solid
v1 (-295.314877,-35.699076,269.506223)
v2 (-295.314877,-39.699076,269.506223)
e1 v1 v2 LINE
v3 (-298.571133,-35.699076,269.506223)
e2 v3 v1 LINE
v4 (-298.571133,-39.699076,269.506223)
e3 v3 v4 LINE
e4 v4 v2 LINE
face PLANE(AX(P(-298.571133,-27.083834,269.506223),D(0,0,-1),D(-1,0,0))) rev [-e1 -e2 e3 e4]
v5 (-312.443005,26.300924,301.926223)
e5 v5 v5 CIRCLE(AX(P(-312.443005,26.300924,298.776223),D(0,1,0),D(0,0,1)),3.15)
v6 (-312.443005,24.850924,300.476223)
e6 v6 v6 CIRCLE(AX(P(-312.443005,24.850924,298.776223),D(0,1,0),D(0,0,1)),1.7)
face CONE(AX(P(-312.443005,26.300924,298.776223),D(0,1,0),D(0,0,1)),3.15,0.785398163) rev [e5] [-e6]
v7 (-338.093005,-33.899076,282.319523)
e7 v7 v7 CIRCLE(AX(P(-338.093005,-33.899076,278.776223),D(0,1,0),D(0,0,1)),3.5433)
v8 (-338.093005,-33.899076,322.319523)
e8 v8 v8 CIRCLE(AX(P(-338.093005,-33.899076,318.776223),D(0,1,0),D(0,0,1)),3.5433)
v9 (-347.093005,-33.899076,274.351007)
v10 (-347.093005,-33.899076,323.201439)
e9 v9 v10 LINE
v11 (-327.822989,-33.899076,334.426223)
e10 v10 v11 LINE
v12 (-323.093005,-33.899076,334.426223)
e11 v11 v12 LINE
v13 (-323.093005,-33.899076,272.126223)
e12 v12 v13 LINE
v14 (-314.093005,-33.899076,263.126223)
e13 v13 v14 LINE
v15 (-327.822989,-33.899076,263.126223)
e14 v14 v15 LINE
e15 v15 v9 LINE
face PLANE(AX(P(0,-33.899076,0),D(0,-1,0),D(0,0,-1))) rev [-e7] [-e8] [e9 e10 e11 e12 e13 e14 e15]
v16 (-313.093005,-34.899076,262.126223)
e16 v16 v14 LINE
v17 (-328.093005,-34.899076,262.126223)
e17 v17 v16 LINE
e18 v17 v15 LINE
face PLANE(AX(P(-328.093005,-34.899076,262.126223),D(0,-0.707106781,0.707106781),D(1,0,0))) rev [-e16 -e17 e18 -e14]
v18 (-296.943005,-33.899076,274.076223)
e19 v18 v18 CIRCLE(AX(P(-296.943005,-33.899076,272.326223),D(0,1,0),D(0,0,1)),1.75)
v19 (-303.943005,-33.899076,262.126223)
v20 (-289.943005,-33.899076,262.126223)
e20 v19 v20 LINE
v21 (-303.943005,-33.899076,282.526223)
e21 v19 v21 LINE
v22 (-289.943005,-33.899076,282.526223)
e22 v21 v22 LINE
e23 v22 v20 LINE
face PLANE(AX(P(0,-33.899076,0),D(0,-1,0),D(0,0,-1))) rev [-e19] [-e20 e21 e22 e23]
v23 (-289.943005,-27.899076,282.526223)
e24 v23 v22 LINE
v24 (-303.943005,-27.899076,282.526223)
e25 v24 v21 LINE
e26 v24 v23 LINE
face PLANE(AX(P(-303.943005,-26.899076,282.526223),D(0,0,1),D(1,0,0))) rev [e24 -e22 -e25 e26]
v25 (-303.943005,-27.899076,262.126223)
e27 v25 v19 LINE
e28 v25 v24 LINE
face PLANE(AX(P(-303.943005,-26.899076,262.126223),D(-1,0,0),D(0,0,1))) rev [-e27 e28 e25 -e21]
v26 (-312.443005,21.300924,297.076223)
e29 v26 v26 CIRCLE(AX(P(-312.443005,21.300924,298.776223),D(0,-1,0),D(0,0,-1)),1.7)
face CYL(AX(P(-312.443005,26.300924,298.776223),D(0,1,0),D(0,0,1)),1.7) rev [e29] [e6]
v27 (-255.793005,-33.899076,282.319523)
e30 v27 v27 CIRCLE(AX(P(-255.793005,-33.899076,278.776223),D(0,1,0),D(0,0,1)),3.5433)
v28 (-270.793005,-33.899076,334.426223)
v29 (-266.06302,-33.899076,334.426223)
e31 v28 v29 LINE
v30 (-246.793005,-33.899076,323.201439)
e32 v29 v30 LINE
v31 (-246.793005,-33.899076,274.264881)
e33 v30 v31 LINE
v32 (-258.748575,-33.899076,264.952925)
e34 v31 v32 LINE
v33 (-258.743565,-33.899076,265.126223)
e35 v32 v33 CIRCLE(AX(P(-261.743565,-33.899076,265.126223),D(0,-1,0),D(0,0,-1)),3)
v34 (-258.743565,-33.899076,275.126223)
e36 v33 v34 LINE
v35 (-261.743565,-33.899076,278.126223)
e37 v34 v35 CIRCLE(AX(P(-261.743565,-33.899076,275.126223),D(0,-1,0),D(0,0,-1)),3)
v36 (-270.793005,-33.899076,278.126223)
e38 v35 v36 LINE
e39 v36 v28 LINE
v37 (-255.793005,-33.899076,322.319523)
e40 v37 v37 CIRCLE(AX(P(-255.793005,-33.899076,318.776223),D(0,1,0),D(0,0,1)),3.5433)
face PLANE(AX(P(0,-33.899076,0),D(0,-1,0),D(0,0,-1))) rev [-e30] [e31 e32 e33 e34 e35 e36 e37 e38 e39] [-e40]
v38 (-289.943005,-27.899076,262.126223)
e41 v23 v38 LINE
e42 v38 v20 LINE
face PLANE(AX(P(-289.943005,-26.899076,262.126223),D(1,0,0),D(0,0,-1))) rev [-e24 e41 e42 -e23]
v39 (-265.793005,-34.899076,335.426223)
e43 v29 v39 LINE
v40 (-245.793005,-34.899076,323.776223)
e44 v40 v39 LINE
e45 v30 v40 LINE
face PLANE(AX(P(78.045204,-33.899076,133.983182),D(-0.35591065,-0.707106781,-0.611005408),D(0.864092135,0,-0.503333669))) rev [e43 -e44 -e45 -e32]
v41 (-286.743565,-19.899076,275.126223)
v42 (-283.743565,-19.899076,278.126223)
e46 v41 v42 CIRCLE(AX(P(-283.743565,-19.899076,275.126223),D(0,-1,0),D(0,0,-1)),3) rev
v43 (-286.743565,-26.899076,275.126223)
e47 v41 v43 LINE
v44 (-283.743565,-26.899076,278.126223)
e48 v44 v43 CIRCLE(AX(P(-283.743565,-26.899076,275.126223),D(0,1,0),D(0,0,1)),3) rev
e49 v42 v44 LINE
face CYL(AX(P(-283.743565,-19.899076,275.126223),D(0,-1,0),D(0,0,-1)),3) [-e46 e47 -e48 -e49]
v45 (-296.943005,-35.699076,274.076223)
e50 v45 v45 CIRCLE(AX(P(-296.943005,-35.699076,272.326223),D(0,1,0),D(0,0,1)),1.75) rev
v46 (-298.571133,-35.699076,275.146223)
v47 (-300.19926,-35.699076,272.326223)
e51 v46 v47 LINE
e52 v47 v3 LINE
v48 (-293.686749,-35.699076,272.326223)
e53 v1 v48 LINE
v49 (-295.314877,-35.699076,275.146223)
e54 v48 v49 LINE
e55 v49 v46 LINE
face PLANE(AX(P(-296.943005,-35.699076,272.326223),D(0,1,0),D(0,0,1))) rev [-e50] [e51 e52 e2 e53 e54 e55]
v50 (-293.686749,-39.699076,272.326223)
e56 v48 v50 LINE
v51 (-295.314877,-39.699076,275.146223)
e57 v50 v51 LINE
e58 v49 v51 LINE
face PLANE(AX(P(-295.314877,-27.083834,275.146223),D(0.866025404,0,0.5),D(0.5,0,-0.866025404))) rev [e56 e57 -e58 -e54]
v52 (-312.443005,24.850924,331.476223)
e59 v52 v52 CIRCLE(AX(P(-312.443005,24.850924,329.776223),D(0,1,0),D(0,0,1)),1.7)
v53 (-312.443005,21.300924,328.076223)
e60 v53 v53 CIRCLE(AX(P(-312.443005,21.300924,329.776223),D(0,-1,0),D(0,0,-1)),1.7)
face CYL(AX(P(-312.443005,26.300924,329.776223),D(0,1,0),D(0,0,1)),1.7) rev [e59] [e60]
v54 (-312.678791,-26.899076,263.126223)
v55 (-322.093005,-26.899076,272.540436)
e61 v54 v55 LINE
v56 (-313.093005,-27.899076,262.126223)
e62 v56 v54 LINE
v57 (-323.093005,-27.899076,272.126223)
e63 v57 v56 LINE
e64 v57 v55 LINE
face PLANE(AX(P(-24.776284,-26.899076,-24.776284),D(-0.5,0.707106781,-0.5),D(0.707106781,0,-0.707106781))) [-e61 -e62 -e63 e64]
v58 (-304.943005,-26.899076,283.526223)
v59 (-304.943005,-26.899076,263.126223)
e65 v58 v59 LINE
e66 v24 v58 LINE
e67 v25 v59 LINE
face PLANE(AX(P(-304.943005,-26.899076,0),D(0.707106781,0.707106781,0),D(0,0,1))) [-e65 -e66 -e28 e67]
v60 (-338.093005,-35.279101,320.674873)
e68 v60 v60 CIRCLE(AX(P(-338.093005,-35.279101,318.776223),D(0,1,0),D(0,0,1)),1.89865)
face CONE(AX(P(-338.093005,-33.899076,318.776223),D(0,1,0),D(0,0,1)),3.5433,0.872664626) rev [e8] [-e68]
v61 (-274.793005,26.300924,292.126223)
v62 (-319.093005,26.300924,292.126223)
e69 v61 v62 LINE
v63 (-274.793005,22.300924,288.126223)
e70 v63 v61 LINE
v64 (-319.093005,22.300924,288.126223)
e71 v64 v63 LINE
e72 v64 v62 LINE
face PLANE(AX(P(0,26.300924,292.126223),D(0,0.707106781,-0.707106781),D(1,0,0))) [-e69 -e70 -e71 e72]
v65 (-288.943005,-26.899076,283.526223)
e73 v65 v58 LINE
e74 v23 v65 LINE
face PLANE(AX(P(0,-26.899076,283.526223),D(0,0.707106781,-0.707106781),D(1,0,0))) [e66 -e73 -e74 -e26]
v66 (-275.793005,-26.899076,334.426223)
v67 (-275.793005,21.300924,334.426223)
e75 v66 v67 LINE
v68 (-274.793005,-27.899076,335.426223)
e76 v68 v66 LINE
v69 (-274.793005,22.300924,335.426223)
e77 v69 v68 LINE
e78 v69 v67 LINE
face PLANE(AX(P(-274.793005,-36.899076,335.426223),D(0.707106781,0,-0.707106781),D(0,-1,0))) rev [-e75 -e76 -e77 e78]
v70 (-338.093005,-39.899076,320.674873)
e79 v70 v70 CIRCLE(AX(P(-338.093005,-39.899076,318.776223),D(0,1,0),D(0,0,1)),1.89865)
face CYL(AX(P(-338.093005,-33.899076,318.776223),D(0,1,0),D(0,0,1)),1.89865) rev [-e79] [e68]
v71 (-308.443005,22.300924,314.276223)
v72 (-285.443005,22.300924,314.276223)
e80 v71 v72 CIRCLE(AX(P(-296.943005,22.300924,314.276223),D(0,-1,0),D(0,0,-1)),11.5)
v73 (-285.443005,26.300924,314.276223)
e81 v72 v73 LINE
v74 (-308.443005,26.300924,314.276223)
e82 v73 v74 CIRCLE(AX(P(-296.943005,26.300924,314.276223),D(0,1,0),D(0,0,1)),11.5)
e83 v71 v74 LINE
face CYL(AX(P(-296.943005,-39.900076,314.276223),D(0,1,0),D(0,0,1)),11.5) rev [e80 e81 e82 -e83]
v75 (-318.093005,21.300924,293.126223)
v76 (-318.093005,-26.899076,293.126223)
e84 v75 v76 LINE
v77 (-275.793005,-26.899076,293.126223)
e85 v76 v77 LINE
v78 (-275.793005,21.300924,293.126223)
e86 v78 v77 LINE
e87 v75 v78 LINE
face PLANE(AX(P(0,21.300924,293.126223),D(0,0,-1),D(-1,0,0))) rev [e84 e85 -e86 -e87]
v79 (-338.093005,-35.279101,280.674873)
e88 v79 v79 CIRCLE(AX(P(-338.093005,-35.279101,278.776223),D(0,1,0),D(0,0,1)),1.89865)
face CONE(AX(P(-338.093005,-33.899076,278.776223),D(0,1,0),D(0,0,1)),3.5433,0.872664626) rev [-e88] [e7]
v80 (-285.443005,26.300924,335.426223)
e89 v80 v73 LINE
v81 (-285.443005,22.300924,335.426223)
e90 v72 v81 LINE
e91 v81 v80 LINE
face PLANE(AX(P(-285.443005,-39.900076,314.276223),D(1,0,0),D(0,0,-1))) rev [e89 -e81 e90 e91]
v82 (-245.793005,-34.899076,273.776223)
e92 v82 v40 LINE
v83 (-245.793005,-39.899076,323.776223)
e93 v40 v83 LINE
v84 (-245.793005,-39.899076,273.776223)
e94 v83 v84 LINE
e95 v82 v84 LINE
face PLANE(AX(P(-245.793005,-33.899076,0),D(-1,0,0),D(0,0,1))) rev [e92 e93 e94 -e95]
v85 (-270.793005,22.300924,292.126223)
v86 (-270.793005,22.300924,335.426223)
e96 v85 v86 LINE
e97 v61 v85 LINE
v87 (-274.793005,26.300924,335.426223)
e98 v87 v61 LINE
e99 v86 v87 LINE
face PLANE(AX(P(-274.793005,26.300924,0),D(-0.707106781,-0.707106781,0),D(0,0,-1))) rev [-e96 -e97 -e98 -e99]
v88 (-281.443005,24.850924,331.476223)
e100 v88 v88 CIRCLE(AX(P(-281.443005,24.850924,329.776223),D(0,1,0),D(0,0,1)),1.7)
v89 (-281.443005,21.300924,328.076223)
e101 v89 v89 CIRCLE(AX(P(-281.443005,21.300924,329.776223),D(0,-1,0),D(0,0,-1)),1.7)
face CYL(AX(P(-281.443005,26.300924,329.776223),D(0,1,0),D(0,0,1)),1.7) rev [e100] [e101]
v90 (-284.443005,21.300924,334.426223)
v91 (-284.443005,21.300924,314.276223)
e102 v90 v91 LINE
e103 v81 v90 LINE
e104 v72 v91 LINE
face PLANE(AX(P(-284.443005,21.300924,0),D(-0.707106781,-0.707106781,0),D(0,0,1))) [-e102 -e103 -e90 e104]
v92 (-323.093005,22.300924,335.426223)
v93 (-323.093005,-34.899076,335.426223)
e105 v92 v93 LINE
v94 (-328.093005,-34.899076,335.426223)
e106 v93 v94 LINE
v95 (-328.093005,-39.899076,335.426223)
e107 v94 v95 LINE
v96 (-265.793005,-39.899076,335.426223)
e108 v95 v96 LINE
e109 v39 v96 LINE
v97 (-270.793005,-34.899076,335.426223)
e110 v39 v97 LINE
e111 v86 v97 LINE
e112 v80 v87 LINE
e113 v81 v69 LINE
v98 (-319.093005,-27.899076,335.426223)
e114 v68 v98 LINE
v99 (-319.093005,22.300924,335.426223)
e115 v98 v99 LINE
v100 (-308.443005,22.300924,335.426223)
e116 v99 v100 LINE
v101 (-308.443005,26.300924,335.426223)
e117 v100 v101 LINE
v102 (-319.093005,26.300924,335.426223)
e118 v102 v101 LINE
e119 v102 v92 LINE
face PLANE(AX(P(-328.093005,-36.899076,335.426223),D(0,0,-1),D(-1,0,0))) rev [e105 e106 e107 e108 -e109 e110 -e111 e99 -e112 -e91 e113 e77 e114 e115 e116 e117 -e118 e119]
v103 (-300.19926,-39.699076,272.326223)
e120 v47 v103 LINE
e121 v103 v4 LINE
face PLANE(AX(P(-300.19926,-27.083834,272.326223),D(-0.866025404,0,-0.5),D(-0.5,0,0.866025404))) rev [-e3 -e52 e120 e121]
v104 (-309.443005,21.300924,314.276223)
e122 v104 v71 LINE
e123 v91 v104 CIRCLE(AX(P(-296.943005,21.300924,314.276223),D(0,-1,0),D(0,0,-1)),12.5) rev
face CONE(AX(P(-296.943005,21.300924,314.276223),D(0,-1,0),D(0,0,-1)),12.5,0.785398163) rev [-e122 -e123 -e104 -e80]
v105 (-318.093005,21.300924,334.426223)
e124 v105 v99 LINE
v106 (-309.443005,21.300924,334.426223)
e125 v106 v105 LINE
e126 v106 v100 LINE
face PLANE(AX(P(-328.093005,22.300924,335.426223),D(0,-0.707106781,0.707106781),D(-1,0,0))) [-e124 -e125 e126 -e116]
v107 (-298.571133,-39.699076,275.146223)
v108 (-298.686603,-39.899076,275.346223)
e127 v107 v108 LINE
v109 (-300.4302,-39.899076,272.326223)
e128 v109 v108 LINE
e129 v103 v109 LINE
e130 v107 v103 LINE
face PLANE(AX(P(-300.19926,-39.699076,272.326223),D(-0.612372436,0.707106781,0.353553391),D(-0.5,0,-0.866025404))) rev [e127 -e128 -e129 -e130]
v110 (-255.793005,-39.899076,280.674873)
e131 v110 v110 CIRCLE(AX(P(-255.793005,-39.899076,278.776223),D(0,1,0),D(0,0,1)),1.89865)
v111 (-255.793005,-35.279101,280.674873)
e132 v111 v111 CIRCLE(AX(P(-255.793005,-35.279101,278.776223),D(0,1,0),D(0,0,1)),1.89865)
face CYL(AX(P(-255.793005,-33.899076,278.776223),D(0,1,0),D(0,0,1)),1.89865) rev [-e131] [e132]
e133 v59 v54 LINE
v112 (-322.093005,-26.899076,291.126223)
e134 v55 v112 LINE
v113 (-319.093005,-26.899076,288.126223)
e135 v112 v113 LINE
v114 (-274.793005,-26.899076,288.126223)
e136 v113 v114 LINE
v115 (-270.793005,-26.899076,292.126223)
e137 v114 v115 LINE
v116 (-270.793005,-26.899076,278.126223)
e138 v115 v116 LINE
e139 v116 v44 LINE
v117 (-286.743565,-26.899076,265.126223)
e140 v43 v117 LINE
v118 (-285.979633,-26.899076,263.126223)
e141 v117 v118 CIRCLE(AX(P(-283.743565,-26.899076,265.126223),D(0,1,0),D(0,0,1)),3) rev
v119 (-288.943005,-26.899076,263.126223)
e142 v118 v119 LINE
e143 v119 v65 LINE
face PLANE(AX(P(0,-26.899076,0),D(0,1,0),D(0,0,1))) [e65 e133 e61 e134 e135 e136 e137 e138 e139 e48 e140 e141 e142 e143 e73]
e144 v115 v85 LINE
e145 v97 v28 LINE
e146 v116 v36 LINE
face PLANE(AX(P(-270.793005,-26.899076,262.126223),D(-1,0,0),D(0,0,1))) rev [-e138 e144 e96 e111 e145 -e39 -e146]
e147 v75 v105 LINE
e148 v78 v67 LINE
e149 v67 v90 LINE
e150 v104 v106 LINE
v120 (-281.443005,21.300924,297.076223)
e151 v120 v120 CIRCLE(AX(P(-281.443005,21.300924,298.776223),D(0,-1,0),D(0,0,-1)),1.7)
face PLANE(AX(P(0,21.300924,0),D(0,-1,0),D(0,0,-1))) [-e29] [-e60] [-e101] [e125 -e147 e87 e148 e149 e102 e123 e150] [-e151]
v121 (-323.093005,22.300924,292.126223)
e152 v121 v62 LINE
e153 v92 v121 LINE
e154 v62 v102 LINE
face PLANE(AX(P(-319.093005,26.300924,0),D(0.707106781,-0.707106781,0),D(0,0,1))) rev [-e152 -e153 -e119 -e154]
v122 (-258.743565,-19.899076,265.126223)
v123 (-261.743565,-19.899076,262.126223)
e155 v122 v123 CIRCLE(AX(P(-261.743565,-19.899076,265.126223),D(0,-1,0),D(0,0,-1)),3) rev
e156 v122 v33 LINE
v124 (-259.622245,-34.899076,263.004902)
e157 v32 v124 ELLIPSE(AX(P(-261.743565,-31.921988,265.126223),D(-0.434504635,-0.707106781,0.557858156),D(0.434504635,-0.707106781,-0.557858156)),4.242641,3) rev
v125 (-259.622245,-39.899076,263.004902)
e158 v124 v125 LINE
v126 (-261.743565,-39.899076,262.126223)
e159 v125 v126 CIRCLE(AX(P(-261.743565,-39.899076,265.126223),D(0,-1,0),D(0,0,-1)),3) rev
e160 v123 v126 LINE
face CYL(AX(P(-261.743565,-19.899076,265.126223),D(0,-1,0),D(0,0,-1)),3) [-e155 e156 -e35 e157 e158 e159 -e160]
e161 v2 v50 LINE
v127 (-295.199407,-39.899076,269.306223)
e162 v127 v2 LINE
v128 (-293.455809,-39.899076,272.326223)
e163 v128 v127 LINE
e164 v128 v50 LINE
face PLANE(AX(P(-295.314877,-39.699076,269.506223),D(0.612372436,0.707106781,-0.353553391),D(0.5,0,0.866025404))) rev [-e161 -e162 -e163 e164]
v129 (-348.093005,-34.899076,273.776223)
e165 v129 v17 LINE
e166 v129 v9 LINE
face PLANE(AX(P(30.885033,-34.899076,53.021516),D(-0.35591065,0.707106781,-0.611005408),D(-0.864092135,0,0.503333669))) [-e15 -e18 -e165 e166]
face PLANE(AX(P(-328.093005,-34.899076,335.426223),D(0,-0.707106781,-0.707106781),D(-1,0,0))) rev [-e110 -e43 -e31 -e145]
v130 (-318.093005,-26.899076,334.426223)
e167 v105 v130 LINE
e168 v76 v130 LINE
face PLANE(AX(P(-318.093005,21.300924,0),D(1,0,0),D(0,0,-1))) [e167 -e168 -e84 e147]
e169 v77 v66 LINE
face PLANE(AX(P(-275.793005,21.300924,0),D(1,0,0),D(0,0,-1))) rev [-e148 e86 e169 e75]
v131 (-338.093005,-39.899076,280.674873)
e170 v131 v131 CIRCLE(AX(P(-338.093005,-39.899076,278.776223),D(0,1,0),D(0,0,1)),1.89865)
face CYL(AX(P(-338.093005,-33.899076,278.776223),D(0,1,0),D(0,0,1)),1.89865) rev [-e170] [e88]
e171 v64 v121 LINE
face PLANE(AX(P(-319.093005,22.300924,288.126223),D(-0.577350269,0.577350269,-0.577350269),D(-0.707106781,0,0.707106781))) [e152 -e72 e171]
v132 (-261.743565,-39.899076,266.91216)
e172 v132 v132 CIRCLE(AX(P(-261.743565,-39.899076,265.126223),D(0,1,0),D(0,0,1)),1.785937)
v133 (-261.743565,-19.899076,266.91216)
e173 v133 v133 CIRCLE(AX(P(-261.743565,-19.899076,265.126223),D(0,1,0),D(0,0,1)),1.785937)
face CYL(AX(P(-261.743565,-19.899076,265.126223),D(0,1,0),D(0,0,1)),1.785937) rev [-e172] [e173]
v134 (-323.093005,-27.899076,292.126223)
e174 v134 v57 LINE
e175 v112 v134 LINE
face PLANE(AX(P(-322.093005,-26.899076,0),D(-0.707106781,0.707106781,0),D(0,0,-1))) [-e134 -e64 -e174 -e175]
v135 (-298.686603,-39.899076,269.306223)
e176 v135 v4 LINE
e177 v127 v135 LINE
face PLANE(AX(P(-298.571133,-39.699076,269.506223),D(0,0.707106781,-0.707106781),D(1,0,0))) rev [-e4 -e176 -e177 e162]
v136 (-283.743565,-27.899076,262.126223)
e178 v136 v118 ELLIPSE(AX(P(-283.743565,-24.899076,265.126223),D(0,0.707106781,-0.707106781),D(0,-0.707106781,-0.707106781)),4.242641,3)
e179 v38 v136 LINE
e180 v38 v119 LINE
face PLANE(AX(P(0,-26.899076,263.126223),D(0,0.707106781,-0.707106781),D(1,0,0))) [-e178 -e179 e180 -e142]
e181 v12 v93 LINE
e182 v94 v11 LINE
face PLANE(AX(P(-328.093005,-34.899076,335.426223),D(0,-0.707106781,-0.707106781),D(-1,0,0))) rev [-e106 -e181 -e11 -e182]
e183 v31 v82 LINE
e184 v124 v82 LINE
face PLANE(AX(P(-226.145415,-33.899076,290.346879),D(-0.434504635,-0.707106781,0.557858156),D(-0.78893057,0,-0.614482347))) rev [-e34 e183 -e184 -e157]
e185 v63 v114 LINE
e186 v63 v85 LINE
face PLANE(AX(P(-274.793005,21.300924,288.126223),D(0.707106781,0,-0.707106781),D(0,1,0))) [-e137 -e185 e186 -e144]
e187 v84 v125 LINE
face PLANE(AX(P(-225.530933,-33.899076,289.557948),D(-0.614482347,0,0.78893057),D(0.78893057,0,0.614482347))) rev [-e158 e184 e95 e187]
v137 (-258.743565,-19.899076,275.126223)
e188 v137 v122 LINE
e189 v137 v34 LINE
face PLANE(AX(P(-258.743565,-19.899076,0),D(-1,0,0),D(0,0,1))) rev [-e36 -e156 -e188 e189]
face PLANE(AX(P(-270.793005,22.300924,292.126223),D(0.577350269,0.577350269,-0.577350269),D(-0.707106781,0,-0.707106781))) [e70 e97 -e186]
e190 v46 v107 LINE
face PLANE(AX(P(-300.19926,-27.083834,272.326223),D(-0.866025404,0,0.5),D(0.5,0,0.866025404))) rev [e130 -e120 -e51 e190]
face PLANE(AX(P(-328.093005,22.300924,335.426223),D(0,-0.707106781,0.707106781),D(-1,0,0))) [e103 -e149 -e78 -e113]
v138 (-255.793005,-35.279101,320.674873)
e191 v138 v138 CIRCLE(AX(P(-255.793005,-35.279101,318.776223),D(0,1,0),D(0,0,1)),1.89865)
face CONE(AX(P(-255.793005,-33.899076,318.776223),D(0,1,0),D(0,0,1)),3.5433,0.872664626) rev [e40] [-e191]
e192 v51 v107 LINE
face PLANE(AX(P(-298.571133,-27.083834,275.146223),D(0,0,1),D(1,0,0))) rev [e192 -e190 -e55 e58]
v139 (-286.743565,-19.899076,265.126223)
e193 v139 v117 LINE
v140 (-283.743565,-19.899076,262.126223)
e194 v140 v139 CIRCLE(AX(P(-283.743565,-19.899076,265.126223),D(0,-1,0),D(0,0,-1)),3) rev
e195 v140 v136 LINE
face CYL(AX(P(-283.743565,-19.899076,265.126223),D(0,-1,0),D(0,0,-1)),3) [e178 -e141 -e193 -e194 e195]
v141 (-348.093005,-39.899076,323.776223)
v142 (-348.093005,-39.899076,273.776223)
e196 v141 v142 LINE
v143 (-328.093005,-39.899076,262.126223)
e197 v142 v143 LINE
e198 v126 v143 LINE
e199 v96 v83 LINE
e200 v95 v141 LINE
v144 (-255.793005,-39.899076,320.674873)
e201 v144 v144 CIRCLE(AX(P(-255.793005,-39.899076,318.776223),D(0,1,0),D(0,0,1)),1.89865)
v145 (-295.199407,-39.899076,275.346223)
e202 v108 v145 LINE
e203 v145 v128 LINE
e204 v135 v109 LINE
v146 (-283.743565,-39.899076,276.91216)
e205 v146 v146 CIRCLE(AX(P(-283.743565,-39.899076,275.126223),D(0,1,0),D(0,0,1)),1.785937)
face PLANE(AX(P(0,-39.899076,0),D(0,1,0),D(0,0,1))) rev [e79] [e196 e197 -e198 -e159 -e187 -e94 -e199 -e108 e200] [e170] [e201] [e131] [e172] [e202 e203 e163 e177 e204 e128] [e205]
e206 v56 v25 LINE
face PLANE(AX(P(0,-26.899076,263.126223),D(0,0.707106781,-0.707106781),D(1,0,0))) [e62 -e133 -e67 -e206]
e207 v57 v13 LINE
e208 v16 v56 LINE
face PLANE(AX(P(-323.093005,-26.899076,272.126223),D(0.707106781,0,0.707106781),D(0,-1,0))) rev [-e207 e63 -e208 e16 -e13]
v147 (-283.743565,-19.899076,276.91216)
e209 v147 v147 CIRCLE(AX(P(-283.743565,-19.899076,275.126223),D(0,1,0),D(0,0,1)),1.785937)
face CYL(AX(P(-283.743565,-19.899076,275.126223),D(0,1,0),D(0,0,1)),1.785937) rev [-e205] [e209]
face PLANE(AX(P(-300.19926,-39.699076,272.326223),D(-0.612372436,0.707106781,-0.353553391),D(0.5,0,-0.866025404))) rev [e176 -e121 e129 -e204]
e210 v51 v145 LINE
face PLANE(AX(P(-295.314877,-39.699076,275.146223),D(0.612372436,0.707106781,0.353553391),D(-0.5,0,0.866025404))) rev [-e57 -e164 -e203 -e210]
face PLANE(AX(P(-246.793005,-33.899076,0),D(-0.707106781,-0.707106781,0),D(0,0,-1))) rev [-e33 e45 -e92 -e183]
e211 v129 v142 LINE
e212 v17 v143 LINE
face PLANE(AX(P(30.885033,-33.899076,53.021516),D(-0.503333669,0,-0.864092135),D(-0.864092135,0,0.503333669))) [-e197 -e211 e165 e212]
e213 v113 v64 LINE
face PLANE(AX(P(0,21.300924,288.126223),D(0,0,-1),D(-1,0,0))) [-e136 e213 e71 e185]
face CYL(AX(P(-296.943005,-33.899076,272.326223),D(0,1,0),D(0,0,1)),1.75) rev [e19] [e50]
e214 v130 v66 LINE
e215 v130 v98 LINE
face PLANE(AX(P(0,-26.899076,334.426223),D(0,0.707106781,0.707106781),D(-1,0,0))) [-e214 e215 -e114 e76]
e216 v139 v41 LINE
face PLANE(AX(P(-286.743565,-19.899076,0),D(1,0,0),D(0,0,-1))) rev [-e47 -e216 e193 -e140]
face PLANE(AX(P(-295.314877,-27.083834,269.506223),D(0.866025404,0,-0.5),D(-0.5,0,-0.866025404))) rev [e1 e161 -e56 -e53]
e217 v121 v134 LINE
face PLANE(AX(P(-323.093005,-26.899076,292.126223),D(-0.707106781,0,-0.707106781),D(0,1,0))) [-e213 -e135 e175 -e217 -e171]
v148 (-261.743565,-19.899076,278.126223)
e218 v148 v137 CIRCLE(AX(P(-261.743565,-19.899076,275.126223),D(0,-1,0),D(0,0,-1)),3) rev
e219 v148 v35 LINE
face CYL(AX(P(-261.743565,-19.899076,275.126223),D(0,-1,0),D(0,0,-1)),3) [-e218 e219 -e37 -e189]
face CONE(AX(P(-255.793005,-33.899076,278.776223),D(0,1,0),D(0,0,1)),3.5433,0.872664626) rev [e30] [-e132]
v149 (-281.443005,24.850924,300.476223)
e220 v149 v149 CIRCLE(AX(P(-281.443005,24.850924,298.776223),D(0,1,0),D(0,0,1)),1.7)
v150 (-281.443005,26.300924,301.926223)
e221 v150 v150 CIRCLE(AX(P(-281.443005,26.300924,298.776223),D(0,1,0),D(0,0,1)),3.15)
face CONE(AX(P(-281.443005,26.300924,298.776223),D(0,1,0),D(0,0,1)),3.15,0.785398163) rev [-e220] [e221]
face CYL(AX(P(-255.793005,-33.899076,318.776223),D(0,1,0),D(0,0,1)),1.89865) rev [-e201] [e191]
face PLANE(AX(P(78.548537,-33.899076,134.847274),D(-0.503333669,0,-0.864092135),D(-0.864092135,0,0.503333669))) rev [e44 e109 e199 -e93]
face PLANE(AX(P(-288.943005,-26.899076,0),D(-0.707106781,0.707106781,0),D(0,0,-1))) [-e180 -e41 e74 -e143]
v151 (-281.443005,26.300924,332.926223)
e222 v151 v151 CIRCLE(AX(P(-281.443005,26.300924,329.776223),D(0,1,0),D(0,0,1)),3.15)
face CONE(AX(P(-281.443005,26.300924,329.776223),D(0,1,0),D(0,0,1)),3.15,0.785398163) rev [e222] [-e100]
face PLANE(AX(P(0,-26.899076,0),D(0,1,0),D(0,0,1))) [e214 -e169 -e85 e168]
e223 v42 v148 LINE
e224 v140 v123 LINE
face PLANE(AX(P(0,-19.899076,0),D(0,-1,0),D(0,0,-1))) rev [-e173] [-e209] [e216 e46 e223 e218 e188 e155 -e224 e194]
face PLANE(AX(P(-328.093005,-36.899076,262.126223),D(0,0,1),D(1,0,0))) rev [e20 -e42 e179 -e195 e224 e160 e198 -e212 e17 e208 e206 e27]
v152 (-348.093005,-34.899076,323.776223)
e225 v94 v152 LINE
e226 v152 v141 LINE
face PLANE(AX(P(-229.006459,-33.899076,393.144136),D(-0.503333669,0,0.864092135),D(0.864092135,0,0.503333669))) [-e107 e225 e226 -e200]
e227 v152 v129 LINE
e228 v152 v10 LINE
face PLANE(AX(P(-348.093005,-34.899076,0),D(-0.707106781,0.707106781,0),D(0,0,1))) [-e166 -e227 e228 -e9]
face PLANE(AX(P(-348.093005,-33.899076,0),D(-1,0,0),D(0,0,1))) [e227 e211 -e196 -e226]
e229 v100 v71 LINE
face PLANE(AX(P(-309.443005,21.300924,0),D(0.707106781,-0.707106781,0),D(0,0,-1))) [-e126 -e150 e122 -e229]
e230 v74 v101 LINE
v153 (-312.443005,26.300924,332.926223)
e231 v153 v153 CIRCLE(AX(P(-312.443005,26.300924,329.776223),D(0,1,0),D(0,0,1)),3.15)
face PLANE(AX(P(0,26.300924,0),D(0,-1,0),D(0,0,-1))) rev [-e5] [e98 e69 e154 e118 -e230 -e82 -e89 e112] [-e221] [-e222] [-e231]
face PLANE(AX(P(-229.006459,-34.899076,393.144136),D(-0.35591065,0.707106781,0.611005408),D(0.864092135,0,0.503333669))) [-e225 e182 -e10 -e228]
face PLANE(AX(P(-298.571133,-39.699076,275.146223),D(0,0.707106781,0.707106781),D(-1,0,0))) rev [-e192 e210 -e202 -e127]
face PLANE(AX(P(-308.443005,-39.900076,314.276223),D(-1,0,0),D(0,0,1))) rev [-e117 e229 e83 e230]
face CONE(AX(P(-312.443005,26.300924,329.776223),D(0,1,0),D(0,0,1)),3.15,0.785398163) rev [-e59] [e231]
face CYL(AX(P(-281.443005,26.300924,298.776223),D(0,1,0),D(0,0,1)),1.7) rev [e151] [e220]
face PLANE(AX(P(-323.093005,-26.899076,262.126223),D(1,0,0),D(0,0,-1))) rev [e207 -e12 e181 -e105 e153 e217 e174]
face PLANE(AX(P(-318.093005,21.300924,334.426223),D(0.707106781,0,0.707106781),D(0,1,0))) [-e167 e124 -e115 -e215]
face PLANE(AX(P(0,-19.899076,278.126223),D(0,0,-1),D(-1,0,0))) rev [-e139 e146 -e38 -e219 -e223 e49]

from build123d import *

# Parameters (mm, degrees)
SKETCH2_W                                         = 62.3
SKETCH2_H                                         = 73.3
BOSS_EXTRUDE1_DEPTH                               = 3
BOSS_EXTRUDE3_DEPTH                               = 10
BOSS_EXTRUDE4_DEPTH                               = 48.2
SKETCH13_W                                        = 52.3
SKETCH13_H                                        = 47.3
BOSS_EXTRUDE5_DEPTH                               = 5
CUT_EXTRUDE2_REACH                                = 475.855
CSK_FOR_M3_FLAT_HEAD_MACHINE_SCREW1_D             = 3.4
CSK_FOR_M3_FLAT_HEAD_MACHINE_SCREW1_DEPTH         = 5
CSK_FOR_M3_FLAT_HEAD_MACHINE_SCREW1_CSINK_D       = 6.3
CSK_FOR_M3_FLAT_HEAD_MACHINE_SCREW1_CSINK_ANGLE   = 90
CHAMFER1_SIZE                                     = 1
BOSS_EXTRUDE7_DEPTH                               = 20
BOSS_EXTRUDE6_START                               = -6
BOSS_EXTRUDE6_OUTLINE_W                           = 14
BOSS_EXTRUDE6_OUTLINE_H                           = 20.4
BOSS_EXTRUDE6_DEPTH                               = 6
CHAMFER5_SIZE                                     = 10
CHAMFER2_SIZE                                     = 4
CSK_FOR_6_FLAT_HEAD_MACHINE_SCREW_100_D           = 3.7973
CSK_FOR_6_FLAT_HEAD_MACHINE_SCREW_100_CSINK_D     = 7.0866
CSK_FOR_6_FLAT_HEAD_MACHINE_SCREW_100_CSINK_ANGLE = 100
CHAMFER3_SIZE                                     = 1
F_3_0MM_DOWEL_HOLE1_D                             = 3.5
F_3_32_0_140625_DOWEL_HOLE1_D                     = 3.571875
HOLE4_D                                           = 5.64
HOLE4_DEPTH                                       = 4.2
CUT_EXTRUDE3_DEPTH                                = 4.2
CHAMFER4_SIZE                                     = 0.2


# Read off the part's stored shape, not the designer's step: Boss-Extrude6
with BuildPart() as part:
    # Sketch2 → Boss-Extrude1 (new body)
    with BuildSketch(Plane(origin=(0, -39.89907595, 0), x_dir=(1, 0, 0), z_dir=(0, 1, 0))):
        with Locations((-296.943004764, -298.776222799)):
            Rectangle(SKETCH2_W, SKETCH2_H)
    extrude(amount=BOSS_EXTRUDE1_DEPTH)

    # Sketch4 → Boss-Extrude3 (add)
    with BuildSketch(Plane(origin=(0, -36.89907595, 0), x_dir=(1, 0, 0), z_dir=(0, 1, 0))):
        Polygon((-323.093004764, -262.126222799), (-303.943004764, -262.126222799), (-303.943004764, -282.526222799), (-289.943004764, -282.526222799), (-289.943004764, -262.126222799), (-270.793004764, -262.126222799), (-270.793004764, -335.426222799), (-323.093004764, -335.426222799), align=None)
    extrude(amount=BOSS_EXTRUDE3_DEPTH)

    # Sketch5 → Boss-Extrude4 (add)
    with BuildSketch(Plane(origin=(0, -26.89907595, 0), x_dir=(1, 0, 0), z_dir=(0, 1, 0))):
        Polygon((-270.793004764, -288.126222799), (-323.093004764, -288.126222799), (-323.093004764, -335.426222799), (-318.093004764, -335.426222799), (-318.093004764, -293.126222799), (-275.793004764, -293.126222799), (-275.793004764, -335.426222799), (-270.793004764, -335.426222799), align=None)
    extrude(amount=BOSS_EXTRUDE4_DEPTH)

    # Sketch13 → Boss-Extrude5 (add)
    with BuildSketch(Plane(origin=(0, 21.30092405, 0), x_dir=(1, 0, 0), z_dir=(0, 1, 0))):
        with Locations((-296.943004764, -311.776222799)):
            Rectangle(SKETCH13_W, SKETCH13_H)
    extrude(amount=BOSS_EXTRUDE5_DEPTH)

    # Sketch15 → Cut-Extrude2 (cut, up to next)
    with BuildSketch(Plane(origin=(0, 26.30092405, 0), x_dir=(1, 0, 0), z_dir=(0, 1, 0)), mode=Mode.PRIVATE) as cut_extrude2_sk1:
        with BuildLine():
            Line((-308.443004764, -314.276222799), (-308.443004764, -335.426222799))
            Line((-308.443004764, -335.426222799), (-285.443004764, -335.426222799))
            Line((-285.443004764, -335.426222799), (-285.443004764, -314.276222799))
            ThreePointArc((-285.443004764, -314.276222799), (-296.943004764, -302.776222799), (-308.443004764, -314.276222799))
        make_face()
    cut_extrude2_tool1 = extrude(cut_extrude2_sk1.sketch, amount=-CUT_EXTRUDE2_REACH, mode=Mode.PRIVATE) & part.part
    add(cut_extrude2_tool1.solids().sort_by_distance((-296.943005, 26.300924, 320.226042))[0], mode=Mode.SUBTRACT)

    # CSK for M3 Flat Head Machine Screw1
    with Locations(Plane(origin=(0, 26.30092405, 0), x_dir=(1, 0, 0), z_dir=(0, 1, 0))):
        with Locations((-312.443004764, -298.776222799), (-281.443004764, -298.776222799), (-281.443004764, -329.776222799), (-312.443004764, -329.776222799)):
            CounterSinkHole(CSK_FOR_M3_FLAT_HEAD_MACHINE_SCREW1_D / 2, CSK_FOR_M3_FLAT_HEAD_MACHINE_SCREW1_CSINK_D / 2, depth=CSK_FOR_M3_FLAT_HEAD_MACHINE_SCREW1_DEPTH, counter_sink_angle=CSK_FOR_M3_FLAT_HEAD_MACHINE_SCREW1_CSINK_ANGLE)

    # Chamfer1
    chamfer1_edges = [part.edges().sort_by_distance(p)[0] for p in [
        (-296.943004764, -26.89907595, 335.426222799),
        (-275.793004764, -2.79907595, 335.426222799),
        (-318.093004764, -2.79907595, 335.426222799),
        (-313.268004764, 21.30092405, 335.426222799),
        (-280.618004764, 21.30092405, 335.426222799),
        (-308.443004764, 21.30092405, 324.851222799),
        (-285.443004764, 21.30092405, 324.851222799),
        (-296.943004764, 21.30092405, 302.776222799),
    ]]
    chamfer(chamfer1_edges, length=CHAMFER1_SIZE)

    # Sketch28 → Boss-Extrude7 (add)
    with BuildSketch(Plane(origin=(-288.526747439, -39.89907595, 232.373479331), x_dir=(1, 0, 0), z_dir=(0, 1, 0))):
        with BuildLine():
            Line((29.783182259, -35.452743468), (29.783182259, -32.752743468))
            ThreePointArc((29.783182259, -32.752743468), (28.904502603, -30.631423124), (26.783182259, -29.752743468))
            Line((26.783182259, -29.752743468), (24.083182259, -29.752743468))
            Line((24.083182259, -29.752743468), (4.783182369, -29.752743468))
            ThreePointArc((4.783182369, -29.752743468), (2.661862025, -30.631423124), (1.783182369, -32.752743468))
            Line((1.783182369, -32.752743468), (1.783182259, -40.052743468))
            Line((1.783182259, -40.052743468), (1.783182259, -42.752743468))
            ThreePointArc((1.783182259, -42.752743468), (2.661861916, -44.874063811), (4.783182259, -45.752743468))
            Line((4.783182259, -45.752743468), (7.483182259, -45.752743468))
            Line((7.483182259, -45.752743468), (26.783182369, -45.752743468))
            ThreePointArc((26.783182369, -45.752743468), (28.904502712, -44.874063811), (29.783182369, -42.752743468))
            Line((29.783182369, -42.752743468), (29.783182259, -35.452743468))
        make_face()
    extrude(amount=BOSS_EXTRUDE7_DEPTH)

    # Boss-Extrude6 outline → Boss-Extrude6 (add)
    with BuildSketch(Plane.XZ.offset(39.89907595).offset(BOSS_EXTRUDE6_START)):
        with Locations((-296.943004764, 272.326222799)):
            Rectangle(BOSS_EXTRUDE6_OUTLINE_W, BOSS_EXTRUDE6_OUTLINE_H)
        with BuildLine():
            ThreePointArc((-258.743565179, 265.126222799), (-258.971926582, 263.978172502), (-259.622244836, 263.004902456))
            Line((-259.622244836, 263.004902456), (-245.793004764, 273.776222799))
            Line((-245.793004764, 273.776222799), (-245.793004764, 323.776222799))
            Line((-245.793004764, 323.776222799), (-265.793004764, 335.426222799))
            Line((-265.793004764, 335.426222799), (-270.793004764, 335.426222799))
            Line((-270.793004764, 335.426222799), (-270.793004764, 278.126222799))
            Line((-270.793004764, 278.126222799), (-261.74356507, 278.126222799))
            ThreePointArc((-261.74356507, 278.126222799), (-259.622244726, 277.247543143), (-258.74356507, 275.126222799))
            Line((-258.74356507, 275.126222799), (-258.743565179, 265.126222799))
        make_face()
        Polygon((-328.093004764, 262.126222799), (-323.093004764, 262.126222799), (-323.093004764, 335.426222799), (-328.093004764, 335.426222799), (-348.093004764, 323.776222799), (-348.093004764, 273.776222799), align=None)
    extrude(amount=BOSS_EXTRUDE6_DEPTH)

    # Chamfer5
    chamfer5_edges = [part.edges().sort_by_distance(p)[0] for p in [
        (-323.093004764, -30.39907595, 262.126222799),
    ]]
    chamfer(chamfer5_edges, length=CHAMFER5_SIZE)

    # Chamfer2
    chamfer2_edges = [part.edges().sort_by_distance(p)[0] for p in [
        (-270.793004764, -0.29907595, 288.126222799),
        (-323.093004764, -0.29907595, 288.126222799),
        (-296.943004764, 26.30092405, 288.126222799),
        (-323.093004764, 26.30092405, 311.776222799),
        (-270.793004764, 26.30092405, 311.776222799),
    ]]
    chamfer(chamfer2_edges, length=CHAMFER2_SIZE)

    # CSK for #6 Flat Head Machine Screw (100)1 (through all)
    with Locations(Plane(origin=(0, -33.89907595, 0), x_dir=(1, 0, 0), z_dir=(0, 1, 0))):
        with Locations((-338.093004764, -278.776222799), (-338.093004764, -318.776222799), (-255.793004764, -318.776222799), (-255.793004764, -278.776222799)):
            CounterSinkHole(CSK_FOR_6_FLAT_HEAD_MACHINE_SCREW_100_D / 2, CSK_FOR_6_FLAT_HEAD_MACHINE_SCREW_100_CSINK_D / 2, counter_sink_angle=CSK_FOR_6_FLAT_HEAD_MACHINE_SCREW_100_CSINK_ANGLE)

    # Chamfer3
    chamfer3_edges = [part.edges().sort_by_distance(p)[0] for p in [
        (-286.843284917, -26.89907595, 262.126222799),
        (-268.293004764, -33.89907595, 335.426222799),
        (-303.943004764, -26.89907595, 272.326222799),
        (-255.793004764, -33.89907595, 329.601222799),
        (-245.793004764, -33.89907595, 298.776222799),
        (-252.7076248, -33.89907595, 268.390562628),
        (-308.518004764, -26.89907595, 262.126222799),
        (-348.093004764, -33.89907595, 298.776222799),
        (-338.093004764, -33.89907595, 329.601222799),
        (-325.593004764, -33.89907595, 335.426222799),
        (-318.093004764, -33.89907595, 262.126222799),
        (-338.093004764, -33.89907595, 267.951222799),
        (-289.943004764, -26.89907595, 272.326222799),
        (-296.943004764, -26.89907595, 282.526222799),
        (-323.093004764, -26.89907595, 282.126222799),
        (-318.093004764, -26.89907595, 267.126222799),
    ]]
    chamfer(chamfer3_edges, length=CHAMFER3_SIZE)

    # Ø3.0mm Dowel Hole1 (through all)
    with Locations(Plane(origin=(0, -33.89907595, 0), x_dir=(1, 0, 0), z_dir=(0, 1, 0))):
        with Locations((-296.943004764, -272.326222799)):
            Hole(F_3_0MM_DOWEL_HOLE1_D / 2)

    # 3/32 (0.140625) Dowel Hole1 (through all)
    with Locations(Plane(origin=(0, -19.89907595, 0), x_dir=(1, 0, 0), z_dir=(0, 1, 0))):
        with Locations((-283.743565179, -275.126222799), (-261.743565179, -265.126222799)):
            Hole(F_3_32_0_140625_DOWEL_HOLE1_D / 2)

    # Hole4
    with Locations(Plane(origin=(0, -39.89907595, 0), x_dir=(-1, 0, 0), z_dir=(0, -1, 0))):
        with Locations((296.943004764, -272.326222799)):
            Hole(HOLE4_D / 2, depth=HOLE4_DEPTH)

    # Sketch36 → Cut-Extrude3 (cut)
    with BuildSketch(Plane.XZ.offset(39.89907595)):
        Polygon((-298.571132523, 275.146222799), (-295.314877005, 275.146222799), (-293.686749245, 272.326222799), (-295.314877005, 269.506222799), (-298.571132523, 269.506222799), (-300.199260282, 272.326222799), align=None)
    extrude(amount=-CUT_EXTRUDE3_DEPTH, mode=Mode.SUBTRACT)

    # Chamfer4
    chamfer4_edges = [part.edges().sort_by_distance(p)[0] for p in [
        (-296.943004764, -39.89907595, 275.146222799),
        (-299.385196402, -39.89907595, 273.736222799),
        (-299.385196402, -39.89907595, 270.916222799),
        (-296.943004764, -39.89907595, 269.506222799),
        (-294.500813125, -39.89907595, 270.916222799),
        (-294.500813125, -39.89907595, 273.736222799),
    ]]
    chamfer(chamfer4_edges, length=CHAMFER4_SIZE)


solid = part.part
